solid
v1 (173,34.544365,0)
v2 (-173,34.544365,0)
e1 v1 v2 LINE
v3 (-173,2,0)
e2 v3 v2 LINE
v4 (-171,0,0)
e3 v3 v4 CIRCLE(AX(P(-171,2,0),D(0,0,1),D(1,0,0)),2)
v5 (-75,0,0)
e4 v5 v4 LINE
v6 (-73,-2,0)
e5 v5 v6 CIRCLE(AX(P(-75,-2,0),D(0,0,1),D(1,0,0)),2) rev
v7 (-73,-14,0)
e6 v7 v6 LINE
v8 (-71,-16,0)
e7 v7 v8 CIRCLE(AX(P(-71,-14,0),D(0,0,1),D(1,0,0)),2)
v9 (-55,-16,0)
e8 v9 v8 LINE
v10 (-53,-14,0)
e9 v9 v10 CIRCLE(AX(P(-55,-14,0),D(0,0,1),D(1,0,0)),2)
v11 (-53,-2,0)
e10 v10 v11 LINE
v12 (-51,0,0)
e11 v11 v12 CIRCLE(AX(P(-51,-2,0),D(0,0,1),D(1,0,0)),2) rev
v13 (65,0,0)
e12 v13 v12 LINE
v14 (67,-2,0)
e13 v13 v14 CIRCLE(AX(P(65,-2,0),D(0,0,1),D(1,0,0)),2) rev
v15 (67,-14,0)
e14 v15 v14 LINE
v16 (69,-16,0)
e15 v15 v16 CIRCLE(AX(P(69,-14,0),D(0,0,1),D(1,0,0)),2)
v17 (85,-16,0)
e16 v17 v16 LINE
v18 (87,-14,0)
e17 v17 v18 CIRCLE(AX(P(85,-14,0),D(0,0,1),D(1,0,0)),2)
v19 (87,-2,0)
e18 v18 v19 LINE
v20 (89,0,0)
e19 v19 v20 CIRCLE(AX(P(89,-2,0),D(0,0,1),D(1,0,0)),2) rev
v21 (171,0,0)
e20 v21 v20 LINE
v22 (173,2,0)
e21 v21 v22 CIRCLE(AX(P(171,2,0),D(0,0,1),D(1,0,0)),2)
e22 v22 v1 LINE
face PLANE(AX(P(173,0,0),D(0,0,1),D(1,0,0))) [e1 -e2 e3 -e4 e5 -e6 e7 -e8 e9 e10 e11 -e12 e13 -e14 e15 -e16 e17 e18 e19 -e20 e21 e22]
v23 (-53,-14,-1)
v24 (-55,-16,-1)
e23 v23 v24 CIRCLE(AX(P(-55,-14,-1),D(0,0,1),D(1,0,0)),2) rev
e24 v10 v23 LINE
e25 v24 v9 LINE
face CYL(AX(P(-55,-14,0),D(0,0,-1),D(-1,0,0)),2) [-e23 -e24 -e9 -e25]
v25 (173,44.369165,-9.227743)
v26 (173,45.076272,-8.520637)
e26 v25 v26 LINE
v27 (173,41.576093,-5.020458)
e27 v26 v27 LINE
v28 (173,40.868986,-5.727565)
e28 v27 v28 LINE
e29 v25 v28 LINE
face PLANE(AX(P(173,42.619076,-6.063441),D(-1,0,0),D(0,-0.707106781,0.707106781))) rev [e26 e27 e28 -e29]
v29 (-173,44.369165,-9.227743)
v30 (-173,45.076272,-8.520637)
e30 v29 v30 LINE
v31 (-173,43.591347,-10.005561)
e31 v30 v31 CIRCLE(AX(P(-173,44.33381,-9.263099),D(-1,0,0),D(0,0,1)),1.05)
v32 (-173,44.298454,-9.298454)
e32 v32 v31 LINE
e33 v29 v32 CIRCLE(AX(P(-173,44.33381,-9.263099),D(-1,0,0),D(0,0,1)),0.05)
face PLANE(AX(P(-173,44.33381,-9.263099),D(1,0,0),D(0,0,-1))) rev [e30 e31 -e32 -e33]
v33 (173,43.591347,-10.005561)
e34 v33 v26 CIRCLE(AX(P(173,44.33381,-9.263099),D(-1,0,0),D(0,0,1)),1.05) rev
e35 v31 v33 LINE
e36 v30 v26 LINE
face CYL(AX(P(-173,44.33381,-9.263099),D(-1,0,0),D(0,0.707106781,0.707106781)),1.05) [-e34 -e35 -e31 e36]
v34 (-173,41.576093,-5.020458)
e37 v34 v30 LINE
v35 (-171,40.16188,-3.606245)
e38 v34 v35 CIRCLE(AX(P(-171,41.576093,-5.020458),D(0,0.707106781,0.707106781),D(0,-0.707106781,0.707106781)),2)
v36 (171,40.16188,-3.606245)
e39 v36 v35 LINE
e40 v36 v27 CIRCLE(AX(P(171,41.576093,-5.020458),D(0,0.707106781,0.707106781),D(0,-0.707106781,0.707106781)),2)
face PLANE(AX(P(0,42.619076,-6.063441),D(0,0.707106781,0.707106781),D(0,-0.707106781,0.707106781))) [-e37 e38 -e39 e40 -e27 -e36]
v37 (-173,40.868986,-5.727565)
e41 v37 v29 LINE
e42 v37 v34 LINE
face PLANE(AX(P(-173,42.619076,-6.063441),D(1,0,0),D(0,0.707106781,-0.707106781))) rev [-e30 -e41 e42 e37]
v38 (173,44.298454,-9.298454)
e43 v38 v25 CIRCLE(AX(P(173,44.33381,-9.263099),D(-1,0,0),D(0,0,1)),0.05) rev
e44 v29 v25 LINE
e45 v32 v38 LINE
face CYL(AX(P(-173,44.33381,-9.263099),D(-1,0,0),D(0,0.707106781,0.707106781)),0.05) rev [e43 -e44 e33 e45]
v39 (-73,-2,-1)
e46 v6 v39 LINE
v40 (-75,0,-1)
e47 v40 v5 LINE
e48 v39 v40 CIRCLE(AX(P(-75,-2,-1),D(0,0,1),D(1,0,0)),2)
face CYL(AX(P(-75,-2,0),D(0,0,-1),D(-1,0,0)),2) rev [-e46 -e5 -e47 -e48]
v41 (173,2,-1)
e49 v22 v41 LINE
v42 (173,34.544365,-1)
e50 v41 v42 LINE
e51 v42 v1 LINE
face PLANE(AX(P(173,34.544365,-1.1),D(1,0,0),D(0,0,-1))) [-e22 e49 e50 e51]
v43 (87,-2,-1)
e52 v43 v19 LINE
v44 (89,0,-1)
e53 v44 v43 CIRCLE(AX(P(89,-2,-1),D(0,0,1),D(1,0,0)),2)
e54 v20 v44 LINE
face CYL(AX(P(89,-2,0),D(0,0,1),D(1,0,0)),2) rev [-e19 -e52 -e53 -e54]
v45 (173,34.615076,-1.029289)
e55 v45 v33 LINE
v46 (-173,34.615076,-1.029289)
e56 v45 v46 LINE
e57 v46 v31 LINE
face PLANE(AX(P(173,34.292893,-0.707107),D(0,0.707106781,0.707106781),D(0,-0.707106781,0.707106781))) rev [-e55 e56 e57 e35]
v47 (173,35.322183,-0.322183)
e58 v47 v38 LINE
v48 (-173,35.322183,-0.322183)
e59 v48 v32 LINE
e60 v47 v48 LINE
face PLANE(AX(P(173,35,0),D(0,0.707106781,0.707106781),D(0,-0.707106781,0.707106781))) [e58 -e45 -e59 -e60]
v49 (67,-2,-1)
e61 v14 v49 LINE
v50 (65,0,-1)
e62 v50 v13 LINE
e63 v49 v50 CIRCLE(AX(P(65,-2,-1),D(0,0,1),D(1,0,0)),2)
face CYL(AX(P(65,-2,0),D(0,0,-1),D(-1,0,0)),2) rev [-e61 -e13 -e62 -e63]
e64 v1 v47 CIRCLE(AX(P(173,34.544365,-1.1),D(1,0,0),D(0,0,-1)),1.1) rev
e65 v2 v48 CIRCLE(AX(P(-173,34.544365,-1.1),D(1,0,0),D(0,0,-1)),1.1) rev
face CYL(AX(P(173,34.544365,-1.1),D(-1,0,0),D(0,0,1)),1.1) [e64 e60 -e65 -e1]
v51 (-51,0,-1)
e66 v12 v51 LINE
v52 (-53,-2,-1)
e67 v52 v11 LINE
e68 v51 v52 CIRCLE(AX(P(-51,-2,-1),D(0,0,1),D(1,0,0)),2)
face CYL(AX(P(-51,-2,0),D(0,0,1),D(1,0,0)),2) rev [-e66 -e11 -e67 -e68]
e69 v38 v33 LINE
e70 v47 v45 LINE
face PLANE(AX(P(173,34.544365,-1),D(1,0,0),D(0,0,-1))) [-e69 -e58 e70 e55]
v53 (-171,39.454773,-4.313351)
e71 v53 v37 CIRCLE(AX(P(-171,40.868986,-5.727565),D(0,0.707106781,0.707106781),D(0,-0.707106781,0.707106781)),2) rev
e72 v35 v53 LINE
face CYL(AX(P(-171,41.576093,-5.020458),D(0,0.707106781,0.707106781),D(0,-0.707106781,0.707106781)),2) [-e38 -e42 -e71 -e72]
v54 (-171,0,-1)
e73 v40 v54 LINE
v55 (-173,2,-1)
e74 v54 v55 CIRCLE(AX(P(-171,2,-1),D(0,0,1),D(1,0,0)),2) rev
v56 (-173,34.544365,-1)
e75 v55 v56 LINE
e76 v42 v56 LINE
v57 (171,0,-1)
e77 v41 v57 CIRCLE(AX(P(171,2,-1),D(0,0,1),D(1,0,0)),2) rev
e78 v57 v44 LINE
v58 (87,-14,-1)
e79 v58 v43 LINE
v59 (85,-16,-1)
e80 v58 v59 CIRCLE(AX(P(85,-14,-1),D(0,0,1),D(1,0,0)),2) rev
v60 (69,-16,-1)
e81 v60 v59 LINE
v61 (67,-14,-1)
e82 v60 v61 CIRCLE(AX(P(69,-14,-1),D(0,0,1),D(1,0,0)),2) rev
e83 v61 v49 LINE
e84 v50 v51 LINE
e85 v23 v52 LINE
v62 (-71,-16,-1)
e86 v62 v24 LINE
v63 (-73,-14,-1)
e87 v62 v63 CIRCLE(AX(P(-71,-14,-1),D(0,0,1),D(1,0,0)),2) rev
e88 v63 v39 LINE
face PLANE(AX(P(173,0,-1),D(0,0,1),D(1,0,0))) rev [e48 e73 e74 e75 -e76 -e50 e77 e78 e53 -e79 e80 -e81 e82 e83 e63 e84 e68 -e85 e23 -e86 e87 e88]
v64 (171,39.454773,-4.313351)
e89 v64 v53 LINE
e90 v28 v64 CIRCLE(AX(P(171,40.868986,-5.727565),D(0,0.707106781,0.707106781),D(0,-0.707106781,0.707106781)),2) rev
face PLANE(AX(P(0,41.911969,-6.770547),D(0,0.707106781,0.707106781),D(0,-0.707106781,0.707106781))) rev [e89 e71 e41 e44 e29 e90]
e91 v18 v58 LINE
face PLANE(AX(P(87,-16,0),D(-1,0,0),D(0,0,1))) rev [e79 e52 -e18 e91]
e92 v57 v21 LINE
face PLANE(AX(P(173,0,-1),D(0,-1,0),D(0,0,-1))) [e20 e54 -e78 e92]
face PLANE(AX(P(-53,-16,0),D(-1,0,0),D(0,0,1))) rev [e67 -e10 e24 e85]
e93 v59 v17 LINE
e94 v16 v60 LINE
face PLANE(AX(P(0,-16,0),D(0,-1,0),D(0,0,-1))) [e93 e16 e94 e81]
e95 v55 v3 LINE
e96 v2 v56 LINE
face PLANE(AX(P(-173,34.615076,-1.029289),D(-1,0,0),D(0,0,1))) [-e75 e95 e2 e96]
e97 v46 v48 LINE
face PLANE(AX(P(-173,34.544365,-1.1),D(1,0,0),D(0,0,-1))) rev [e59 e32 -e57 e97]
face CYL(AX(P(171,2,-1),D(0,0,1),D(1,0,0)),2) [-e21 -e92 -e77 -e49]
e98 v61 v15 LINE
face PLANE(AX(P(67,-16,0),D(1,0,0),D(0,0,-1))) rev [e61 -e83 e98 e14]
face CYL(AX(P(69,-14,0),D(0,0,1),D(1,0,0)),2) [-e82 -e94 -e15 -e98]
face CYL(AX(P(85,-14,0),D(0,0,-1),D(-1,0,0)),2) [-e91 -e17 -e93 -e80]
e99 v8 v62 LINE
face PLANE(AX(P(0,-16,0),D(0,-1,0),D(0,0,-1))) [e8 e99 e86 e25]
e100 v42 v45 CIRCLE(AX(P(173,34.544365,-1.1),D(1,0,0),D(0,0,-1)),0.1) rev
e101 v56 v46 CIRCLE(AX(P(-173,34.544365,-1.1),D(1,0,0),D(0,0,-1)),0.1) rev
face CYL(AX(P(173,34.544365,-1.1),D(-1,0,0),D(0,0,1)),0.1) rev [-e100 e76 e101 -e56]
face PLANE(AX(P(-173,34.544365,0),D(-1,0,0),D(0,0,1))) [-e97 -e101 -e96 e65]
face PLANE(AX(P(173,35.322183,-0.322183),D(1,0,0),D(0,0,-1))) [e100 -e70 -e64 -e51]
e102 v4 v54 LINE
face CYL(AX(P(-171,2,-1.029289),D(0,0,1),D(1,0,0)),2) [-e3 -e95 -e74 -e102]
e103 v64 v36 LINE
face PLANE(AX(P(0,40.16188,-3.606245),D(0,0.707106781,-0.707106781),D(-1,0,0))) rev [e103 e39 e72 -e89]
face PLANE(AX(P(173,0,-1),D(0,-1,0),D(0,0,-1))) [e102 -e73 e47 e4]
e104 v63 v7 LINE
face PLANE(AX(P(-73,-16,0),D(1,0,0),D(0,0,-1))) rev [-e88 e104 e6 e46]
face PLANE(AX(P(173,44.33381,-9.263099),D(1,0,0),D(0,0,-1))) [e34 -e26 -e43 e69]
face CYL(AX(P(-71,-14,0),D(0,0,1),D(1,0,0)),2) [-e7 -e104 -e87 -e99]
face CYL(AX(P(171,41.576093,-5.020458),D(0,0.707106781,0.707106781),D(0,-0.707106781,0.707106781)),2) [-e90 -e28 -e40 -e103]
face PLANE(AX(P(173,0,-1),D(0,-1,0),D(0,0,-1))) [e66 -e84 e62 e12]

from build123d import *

# Parameters (mm, degrees)
BASIS_BLECH1_DEPTH              = 173
BLECHKANTENRAND1_START          = -173
BLECHKANTENRAND1_DEPTH          = 346
BLECHKANTENRAND1_2_DEPTH        = 346
VERRUNDUNG1_R                   = 2
SKIZZE19_W                      = 20
SKIZZE19_H                      = 1
AUFSATZ_LINEAR_AUSTRAGEN1_DEPTH = 16
VERRUNDUNG2_R                   = 2


# Read off the part's stored shape, not the designer's step: Blechkantenrand1
# Sheet-metal steps are written as plain solids
with BuildPart() as part:
    # Skizze1 → Basis-Blech1 (new, symmetric)
    with BuildSketch(Plane(origin=(0, 0, 0), x_dir=(0, 0, -1), z_dir=(1, 0, 0))):
        with BuildLine():
            Line((0, 0), (0, 34.544365081))
            ThreePointArc((0, 34.544365081), (0.083732514, 34.965316857), (0.322182541, 35.322182541))
            Line((0.322182541, 35.322182541), (10.040916293, 45.040916293))
            Line((10.040916293, 45.040916293), (10.748023074, 44.333809512))
            Line((10.748023074, 44.333809512), (1.029289322, 34.61507576))
            ThreePointArc((1.029289322, 34.61507576), (1.007612047, 34.582633425), (1, 34.544365081))
            Line((1, 34.544365081), (1, 0))
            Line((1, 0), (0, 0))
        make_face()
    extrude(amount=BASIS_BLECH1_DEPTH, both=True)

    # Blechkantenrand1 outline → Blechkantenrand1 (cut)
    with BuildSketch(Plane.YZ.offset(BLECHKANTENRAND1_START)):
        with BuildLine():
            Line((45.040916293, -10.040916293), (45.040074021, -10.040074021))
            ThreePointArc((45.040074021, -10.040074021), (44.308802418, -10.312801004), (43.591347391, -10.005560954))
            Line((43.591347391, -10.005560954), (44.333809512, -10.748023074))
            Line((44.333809512, -10.748023074), (45.040916293, -10.040916293))
        make_face()
    extrude(amount=BLECHKANTENRAND1_DEPTH, mode=Mode.SUBTRACT)

    # Blechkantenrand1 2 outline → Blechkantenrand1 2 (add)
    with BuildSketch(Plane.YZ.offset(BLECHKANTENRAND1_START)):
        with BuildLine():
            Line((40.161879503, -3.606244584), (39.454772721, -4.313351365))
            Line((39.454772721, -4.313351365), (44.369164851, -9.227743494))
            ThreePointArc((44.369164851, -9.227743494), (44.369164852, -9.298454172), (44.298454173, -9.298454173))
            Line((44.298454173, -9.298454173), (45.040074021, -10.040074021))
            ThreePointArc((45.040074021, -10.040074021), (45.383511682, -9.288105927), (45.076271632, -8.520636713))
            Line((45.076271632, -8.520636713), (40.161879503, -3.606244584))
        make_face()
    extrude(amount=BLECHKANTENRAND1_2_DEPTH)

    # Verrundung1
    verrundung1_edges = [part.edges().sort_by_distance(p)[0] for p in [
        (173, 0, -0.5),
        (-173, 39.808326112, -3.959797974),
        (173, 39.808326112, -3.959797974),
        (-173, 0, -0.5),
    ]]
    fillet(verrundung1_edges, radius=VERRUNDUNG1_R)

    # Skizze19 → Aufsatz-Linear austragen1 (add)
    with BuildSketch(Plane.XZ):
        with Locations((-63, -0.5)):
            Rectangle(SKIZZE19_W, SKIZZE19_H)
        with Locations((77, -0.5)):
            Rectangle(SKIZZE19_W, SKIZZE19_H)
    extrude(amount=AUFSATZ_LINEAR_AUSTRAGEN1_DEPTH)

    # Verrundung2
    verrundung2_edges = [part.edges().sort_by_distance(p)[0] for p in [
        (-73, 0, -0.5),
        (-53, 0, -0.5),
        (-73, -16, -0.5),
        (-53, -16, -0.5),
        (67, 0, -0.5),
        (87, 0, -0.5),
        (67, -16, -0.5),
        (87, -16, -0.5),
    ]]
    fillet(verrundung2_edges, radius=VERRUNDUNG2_R)


solid = part.part
